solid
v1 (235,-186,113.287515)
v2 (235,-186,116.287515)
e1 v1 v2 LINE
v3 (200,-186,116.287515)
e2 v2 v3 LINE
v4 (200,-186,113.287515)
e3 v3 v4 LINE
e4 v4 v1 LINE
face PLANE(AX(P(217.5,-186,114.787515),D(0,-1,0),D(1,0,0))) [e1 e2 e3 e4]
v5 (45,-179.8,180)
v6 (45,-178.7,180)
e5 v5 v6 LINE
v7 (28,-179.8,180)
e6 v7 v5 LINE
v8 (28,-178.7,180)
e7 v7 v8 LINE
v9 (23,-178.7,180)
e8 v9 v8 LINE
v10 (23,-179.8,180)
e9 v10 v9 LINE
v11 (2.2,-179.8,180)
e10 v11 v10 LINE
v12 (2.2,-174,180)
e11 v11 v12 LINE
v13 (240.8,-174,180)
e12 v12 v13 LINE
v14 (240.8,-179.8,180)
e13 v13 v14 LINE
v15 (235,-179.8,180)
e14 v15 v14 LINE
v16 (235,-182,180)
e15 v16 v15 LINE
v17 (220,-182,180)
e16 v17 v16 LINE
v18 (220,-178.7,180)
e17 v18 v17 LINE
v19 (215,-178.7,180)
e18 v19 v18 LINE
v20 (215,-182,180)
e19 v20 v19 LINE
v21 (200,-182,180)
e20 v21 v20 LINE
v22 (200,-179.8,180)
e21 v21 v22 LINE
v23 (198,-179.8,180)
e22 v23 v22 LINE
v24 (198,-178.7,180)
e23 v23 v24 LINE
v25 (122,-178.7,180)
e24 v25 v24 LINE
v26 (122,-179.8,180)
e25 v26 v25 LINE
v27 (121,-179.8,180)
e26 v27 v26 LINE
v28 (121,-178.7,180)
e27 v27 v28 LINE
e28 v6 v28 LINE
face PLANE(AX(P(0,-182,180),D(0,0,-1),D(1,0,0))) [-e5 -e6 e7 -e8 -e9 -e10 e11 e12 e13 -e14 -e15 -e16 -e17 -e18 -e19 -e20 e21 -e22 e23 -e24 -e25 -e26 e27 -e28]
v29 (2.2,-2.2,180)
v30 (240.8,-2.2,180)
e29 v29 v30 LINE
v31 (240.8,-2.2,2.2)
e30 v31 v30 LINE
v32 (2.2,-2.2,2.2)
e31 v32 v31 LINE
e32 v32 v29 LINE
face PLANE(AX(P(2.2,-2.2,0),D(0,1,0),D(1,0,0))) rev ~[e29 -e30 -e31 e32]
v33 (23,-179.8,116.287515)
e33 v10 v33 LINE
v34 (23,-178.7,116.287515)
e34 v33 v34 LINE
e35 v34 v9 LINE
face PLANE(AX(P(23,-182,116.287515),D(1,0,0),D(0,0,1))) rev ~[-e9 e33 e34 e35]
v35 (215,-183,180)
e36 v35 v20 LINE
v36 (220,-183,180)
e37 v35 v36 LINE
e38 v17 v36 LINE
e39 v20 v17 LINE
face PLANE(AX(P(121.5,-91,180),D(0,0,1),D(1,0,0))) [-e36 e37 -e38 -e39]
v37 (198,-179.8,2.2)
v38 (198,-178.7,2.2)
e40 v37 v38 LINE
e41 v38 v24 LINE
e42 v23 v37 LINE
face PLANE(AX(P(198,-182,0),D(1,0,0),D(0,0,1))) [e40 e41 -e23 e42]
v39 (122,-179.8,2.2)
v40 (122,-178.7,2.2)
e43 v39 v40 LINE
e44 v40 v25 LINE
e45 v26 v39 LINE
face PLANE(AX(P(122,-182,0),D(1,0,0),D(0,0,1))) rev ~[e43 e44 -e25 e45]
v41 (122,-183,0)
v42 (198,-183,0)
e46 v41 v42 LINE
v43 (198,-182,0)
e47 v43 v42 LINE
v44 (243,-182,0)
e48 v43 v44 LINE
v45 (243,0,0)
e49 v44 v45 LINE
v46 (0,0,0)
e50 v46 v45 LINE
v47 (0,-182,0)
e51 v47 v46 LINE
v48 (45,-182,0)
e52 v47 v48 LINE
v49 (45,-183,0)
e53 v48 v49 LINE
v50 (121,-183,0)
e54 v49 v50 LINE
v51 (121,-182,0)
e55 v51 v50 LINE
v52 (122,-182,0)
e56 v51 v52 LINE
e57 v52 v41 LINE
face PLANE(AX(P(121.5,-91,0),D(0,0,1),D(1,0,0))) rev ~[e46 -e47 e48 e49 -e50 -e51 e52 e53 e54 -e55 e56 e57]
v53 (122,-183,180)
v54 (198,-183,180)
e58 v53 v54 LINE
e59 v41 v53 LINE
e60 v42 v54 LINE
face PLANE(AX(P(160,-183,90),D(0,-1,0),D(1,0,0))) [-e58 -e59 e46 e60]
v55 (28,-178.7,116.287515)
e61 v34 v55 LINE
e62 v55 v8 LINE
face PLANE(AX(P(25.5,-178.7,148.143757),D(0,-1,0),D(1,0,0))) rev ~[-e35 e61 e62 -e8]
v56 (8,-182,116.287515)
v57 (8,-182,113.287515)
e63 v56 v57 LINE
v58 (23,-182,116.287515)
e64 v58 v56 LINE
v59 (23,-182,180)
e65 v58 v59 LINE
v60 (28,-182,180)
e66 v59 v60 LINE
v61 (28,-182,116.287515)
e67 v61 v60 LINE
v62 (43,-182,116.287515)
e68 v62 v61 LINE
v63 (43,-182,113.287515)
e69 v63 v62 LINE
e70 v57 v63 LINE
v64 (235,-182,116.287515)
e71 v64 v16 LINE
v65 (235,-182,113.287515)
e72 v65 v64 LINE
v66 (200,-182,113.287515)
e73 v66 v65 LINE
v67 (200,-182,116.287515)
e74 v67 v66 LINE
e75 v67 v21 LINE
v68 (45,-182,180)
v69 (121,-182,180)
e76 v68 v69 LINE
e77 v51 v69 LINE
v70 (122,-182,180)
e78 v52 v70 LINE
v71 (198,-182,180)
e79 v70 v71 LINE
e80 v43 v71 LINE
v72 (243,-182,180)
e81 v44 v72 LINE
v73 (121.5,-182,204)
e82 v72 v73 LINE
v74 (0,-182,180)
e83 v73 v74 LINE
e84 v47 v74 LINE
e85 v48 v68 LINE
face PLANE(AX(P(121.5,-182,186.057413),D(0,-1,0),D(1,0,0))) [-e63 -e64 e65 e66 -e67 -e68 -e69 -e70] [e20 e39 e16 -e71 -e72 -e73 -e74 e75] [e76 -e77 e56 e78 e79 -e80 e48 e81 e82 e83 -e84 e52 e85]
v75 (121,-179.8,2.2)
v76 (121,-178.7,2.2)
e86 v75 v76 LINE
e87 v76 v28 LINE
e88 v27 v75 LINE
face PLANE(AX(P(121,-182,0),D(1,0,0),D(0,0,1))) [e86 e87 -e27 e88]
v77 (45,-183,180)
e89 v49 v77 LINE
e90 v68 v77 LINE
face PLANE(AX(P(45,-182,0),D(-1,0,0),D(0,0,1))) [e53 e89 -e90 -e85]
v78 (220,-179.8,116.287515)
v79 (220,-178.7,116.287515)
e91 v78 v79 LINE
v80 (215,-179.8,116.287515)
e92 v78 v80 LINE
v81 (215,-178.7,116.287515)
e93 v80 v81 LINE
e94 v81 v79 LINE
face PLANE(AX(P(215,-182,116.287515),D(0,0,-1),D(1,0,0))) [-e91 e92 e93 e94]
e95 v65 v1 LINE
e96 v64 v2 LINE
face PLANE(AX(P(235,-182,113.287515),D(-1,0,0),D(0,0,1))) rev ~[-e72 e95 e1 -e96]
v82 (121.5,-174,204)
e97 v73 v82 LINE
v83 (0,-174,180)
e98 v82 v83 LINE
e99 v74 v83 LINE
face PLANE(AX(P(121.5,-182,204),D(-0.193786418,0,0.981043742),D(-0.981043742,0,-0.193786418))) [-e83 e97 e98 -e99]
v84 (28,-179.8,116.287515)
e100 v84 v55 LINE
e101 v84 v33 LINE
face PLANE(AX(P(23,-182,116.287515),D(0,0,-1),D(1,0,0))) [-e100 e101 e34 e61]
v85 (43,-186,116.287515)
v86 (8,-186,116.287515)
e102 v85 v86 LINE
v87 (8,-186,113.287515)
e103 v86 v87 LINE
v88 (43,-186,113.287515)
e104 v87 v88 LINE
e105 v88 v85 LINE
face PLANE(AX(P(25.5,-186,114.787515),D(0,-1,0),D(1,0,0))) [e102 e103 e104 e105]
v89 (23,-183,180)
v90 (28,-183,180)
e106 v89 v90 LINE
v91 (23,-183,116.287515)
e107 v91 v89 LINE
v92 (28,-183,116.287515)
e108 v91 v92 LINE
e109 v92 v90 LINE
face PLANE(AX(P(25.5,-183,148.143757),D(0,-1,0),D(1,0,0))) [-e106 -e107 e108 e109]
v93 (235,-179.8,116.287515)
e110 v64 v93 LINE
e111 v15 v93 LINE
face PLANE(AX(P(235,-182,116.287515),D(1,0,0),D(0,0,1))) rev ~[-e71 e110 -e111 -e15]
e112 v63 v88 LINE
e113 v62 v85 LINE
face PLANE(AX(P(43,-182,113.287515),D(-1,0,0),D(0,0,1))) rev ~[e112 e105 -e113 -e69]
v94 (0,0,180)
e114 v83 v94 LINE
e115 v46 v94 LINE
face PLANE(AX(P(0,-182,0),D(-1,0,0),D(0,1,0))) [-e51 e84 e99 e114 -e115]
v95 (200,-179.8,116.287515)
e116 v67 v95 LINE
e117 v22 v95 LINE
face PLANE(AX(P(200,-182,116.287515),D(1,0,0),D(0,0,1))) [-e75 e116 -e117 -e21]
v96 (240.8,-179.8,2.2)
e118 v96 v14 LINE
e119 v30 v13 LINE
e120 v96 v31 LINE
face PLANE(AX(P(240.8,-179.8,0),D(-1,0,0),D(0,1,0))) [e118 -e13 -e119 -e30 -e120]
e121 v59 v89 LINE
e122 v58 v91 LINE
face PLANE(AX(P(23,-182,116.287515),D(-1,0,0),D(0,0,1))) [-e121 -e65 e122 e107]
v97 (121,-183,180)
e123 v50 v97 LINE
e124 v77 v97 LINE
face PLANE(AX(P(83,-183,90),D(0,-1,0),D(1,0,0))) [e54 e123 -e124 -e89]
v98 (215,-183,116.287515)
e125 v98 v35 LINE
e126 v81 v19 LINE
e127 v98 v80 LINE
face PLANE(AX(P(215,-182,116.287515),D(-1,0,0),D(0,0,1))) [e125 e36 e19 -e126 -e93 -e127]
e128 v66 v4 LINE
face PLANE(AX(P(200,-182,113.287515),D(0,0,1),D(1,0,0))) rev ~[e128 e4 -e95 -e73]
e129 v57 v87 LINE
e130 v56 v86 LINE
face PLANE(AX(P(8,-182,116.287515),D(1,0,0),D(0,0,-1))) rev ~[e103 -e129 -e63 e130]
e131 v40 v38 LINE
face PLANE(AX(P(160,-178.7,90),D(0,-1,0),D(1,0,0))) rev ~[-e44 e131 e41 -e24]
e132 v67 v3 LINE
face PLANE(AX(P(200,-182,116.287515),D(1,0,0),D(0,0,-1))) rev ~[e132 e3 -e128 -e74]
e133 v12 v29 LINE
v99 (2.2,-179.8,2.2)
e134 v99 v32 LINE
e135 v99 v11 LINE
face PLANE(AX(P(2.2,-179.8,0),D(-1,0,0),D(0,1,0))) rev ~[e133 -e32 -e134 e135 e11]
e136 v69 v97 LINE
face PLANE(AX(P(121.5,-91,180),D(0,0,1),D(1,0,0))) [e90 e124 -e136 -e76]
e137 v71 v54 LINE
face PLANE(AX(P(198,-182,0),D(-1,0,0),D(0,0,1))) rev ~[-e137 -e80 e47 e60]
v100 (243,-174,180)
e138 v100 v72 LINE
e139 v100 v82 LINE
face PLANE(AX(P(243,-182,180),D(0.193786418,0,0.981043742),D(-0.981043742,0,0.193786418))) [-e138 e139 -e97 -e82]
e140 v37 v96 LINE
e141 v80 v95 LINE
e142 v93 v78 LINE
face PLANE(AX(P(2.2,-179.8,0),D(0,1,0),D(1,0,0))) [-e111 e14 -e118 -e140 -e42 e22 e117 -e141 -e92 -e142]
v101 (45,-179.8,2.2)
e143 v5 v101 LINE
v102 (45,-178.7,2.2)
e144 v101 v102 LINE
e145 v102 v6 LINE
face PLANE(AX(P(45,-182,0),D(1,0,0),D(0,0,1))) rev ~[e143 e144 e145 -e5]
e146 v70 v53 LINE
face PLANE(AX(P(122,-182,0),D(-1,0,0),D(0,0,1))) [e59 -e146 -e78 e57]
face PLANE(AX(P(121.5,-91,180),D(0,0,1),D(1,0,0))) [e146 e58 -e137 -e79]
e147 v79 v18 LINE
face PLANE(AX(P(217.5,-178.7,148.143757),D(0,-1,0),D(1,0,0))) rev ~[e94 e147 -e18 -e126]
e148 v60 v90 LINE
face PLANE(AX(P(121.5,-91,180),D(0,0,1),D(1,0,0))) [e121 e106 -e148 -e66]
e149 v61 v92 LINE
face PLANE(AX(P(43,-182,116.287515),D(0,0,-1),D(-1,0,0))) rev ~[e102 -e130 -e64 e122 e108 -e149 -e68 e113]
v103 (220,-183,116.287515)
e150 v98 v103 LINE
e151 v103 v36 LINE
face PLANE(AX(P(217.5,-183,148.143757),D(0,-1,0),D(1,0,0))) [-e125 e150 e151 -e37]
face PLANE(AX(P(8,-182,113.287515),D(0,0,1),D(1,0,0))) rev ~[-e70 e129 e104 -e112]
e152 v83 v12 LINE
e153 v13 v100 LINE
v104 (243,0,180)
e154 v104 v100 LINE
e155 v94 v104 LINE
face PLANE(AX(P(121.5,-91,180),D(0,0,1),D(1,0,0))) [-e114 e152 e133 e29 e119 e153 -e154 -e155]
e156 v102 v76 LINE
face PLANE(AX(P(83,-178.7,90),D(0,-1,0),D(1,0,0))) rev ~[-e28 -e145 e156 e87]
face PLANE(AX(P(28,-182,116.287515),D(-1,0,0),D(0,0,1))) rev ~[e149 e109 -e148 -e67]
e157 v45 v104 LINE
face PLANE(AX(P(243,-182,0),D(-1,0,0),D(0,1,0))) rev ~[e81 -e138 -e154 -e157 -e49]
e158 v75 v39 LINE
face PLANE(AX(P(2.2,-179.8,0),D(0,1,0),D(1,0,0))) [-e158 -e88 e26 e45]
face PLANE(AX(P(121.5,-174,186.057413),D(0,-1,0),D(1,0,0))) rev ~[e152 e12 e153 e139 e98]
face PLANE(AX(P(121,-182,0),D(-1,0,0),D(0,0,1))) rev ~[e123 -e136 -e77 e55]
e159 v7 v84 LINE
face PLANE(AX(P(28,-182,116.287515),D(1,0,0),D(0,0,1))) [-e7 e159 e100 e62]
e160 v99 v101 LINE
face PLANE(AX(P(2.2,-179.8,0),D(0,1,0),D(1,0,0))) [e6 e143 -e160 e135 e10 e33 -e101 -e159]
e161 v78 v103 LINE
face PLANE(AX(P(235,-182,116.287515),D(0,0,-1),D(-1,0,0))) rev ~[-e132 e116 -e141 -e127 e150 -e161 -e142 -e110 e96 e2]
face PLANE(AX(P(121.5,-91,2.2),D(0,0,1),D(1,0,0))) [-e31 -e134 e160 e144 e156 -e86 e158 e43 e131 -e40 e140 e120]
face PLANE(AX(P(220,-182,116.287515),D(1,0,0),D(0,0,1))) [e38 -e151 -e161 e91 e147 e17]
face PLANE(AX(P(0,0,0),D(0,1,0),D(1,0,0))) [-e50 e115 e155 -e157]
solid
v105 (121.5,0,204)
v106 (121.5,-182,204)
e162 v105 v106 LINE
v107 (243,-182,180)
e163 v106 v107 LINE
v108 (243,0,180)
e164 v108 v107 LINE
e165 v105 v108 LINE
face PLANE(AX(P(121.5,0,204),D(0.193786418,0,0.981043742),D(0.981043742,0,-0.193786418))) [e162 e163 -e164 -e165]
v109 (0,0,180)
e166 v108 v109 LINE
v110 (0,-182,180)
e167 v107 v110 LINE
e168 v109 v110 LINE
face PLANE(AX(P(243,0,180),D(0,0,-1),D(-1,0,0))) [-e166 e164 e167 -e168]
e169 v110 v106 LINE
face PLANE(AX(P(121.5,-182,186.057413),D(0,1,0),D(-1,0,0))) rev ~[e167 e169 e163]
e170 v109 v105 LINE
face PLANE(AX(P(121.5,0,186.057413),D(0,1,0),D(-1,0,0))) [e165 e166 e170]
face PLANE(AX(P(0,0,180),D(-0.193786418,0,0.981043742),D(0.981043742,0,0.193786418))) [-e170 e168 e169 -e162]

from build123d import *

# Parameters (mm, degrees)
F0_W          = 243
F0_H          = 182
F0_W_2        = 238.6
F0_H_2        = 177.6
F1_DEPTH      = 180
F2_DEPTH      = 2.2
F3_W          = 76
F3_H          = 180
F3_W_2        = 5
F3_H_2        = 63.7124854326
F4_DEPTH      = 1
F4_DEPTH_BACK = 3.3
F3_W_3        = 15
F5_DEPTH      = 25
F6_DEPTH      = 8
F7_DEPTH      = 4
F9_DEPTH      = 182


# Not quite as in the source:
# - a feature names something its author has since deleted; it is built from what else it names


with BuildPart() as f1:
    # F0 (on Top) → F1 (new body)
    with BuildSketch(Plane.XY):
        with Locations((121.5, -91)):
            Rectangle(F0_W, F0_H)
        with Locations((121.5, -91)):
            Rectangle(F0_W_2, F0_H_2, mode=Mode.SUBTRACT)
    extrude(amount=F1_DEPTH)

    # F0 (on Top) → F2 (join)
    with BuildSketch(Plane.XY):
        with Locations((121.5, -91)):
            Rectangle(F0_W_2, F0_H_2)
    extrude(amount=F2_DEPTH)

    # F3 (on face) → F4 (join, two sides)
    with BuildSketch(Plane.XZ.offset(182)) as f4_sk:
        with Locations((83, 90)):
            Rectangle(F3_W, F3_H)
        with Locations((160, 90)):
            Rectangle(F3_W, F3_H)
        with Locations((25.5, 148.1437572837)):
            Rectangle(F3_W_2, F3_H_2)
        with Locations((217.5, 148.1437572837)):
            Rectangle(F3_W_2, F3_H_2)
    extrude(amount=F4_DEPTH)
    extrude(f4_sk.sketch, amount=-F4_DEPTH_BACK)

    # F3 (on face) → F5 (cut)
    with BuildSketch(Plane.XZ.offset(182)):
        Polygon((43, 180), (45, 180), (121, 180), (122, 180), (198, 180), (200, 180), (215, 180), (220, 180), (235, 180), (243, 180), (121.5, 204), (0, 180), (8, 180), (23, 180), (28, 180), align=None)
        with Locations((207.5, 148.1437572837)):
            Rectangle(F3_W_3, F3_H_2)
        with Locations((227.5, 148.1437572837)):
            Rectangle(F3_W_3, F3_H_2)
    extrude(amount=-F5_DEPTH, mode=Mode.SUBTRACT)

    # F3 (on face) → F6 (join)
    with BuildSketch(Plane.XZ.offset(182)):
        Polygon((43, 180), (45, 180), (121, 180), (122, 180), (198, 180), (200, 180), (215, 180), (220, 180), (235, 180), (243, 180), (121.5, 204), (0, 180), (8, 180), (23, 180), (28, 180), align=None)
    extrude(amount=-F6_DEPTH)

    # F3 (on face) → F7 (join)
    with BuildSketch(Plane.XZ.offset(182)):
        Polygon((215, 116.2875145674), (200, 116.2875145674), (200, 113.2875145674), (235, 113.2875145674), (235, 116.2875145674), (220, 116.2875145674), align=None)
        Polygon((43, 113.2875145674), (43, 116.2875145674), (28, 116.2875145674), (23, 116.2875145674), (8, 116.2875145674), (8, 113.2875145674), align=None)
    extrude(amount=F7_DEPTH)


with BuildPart() as f9:
    # F8 (on face) → F9 (new body)
    with BuildSketch(Plane(origin=(0, 0, 0), x_dir=(-1, 0, 0), z_dir=(0, 1, 0))):
        Polygon((-121.5, 204), (-243, 180), (0, 180), align=None)
    extrude(amount=-F9_DEPTH)


solid = Compound([f1.part, f9.part])
